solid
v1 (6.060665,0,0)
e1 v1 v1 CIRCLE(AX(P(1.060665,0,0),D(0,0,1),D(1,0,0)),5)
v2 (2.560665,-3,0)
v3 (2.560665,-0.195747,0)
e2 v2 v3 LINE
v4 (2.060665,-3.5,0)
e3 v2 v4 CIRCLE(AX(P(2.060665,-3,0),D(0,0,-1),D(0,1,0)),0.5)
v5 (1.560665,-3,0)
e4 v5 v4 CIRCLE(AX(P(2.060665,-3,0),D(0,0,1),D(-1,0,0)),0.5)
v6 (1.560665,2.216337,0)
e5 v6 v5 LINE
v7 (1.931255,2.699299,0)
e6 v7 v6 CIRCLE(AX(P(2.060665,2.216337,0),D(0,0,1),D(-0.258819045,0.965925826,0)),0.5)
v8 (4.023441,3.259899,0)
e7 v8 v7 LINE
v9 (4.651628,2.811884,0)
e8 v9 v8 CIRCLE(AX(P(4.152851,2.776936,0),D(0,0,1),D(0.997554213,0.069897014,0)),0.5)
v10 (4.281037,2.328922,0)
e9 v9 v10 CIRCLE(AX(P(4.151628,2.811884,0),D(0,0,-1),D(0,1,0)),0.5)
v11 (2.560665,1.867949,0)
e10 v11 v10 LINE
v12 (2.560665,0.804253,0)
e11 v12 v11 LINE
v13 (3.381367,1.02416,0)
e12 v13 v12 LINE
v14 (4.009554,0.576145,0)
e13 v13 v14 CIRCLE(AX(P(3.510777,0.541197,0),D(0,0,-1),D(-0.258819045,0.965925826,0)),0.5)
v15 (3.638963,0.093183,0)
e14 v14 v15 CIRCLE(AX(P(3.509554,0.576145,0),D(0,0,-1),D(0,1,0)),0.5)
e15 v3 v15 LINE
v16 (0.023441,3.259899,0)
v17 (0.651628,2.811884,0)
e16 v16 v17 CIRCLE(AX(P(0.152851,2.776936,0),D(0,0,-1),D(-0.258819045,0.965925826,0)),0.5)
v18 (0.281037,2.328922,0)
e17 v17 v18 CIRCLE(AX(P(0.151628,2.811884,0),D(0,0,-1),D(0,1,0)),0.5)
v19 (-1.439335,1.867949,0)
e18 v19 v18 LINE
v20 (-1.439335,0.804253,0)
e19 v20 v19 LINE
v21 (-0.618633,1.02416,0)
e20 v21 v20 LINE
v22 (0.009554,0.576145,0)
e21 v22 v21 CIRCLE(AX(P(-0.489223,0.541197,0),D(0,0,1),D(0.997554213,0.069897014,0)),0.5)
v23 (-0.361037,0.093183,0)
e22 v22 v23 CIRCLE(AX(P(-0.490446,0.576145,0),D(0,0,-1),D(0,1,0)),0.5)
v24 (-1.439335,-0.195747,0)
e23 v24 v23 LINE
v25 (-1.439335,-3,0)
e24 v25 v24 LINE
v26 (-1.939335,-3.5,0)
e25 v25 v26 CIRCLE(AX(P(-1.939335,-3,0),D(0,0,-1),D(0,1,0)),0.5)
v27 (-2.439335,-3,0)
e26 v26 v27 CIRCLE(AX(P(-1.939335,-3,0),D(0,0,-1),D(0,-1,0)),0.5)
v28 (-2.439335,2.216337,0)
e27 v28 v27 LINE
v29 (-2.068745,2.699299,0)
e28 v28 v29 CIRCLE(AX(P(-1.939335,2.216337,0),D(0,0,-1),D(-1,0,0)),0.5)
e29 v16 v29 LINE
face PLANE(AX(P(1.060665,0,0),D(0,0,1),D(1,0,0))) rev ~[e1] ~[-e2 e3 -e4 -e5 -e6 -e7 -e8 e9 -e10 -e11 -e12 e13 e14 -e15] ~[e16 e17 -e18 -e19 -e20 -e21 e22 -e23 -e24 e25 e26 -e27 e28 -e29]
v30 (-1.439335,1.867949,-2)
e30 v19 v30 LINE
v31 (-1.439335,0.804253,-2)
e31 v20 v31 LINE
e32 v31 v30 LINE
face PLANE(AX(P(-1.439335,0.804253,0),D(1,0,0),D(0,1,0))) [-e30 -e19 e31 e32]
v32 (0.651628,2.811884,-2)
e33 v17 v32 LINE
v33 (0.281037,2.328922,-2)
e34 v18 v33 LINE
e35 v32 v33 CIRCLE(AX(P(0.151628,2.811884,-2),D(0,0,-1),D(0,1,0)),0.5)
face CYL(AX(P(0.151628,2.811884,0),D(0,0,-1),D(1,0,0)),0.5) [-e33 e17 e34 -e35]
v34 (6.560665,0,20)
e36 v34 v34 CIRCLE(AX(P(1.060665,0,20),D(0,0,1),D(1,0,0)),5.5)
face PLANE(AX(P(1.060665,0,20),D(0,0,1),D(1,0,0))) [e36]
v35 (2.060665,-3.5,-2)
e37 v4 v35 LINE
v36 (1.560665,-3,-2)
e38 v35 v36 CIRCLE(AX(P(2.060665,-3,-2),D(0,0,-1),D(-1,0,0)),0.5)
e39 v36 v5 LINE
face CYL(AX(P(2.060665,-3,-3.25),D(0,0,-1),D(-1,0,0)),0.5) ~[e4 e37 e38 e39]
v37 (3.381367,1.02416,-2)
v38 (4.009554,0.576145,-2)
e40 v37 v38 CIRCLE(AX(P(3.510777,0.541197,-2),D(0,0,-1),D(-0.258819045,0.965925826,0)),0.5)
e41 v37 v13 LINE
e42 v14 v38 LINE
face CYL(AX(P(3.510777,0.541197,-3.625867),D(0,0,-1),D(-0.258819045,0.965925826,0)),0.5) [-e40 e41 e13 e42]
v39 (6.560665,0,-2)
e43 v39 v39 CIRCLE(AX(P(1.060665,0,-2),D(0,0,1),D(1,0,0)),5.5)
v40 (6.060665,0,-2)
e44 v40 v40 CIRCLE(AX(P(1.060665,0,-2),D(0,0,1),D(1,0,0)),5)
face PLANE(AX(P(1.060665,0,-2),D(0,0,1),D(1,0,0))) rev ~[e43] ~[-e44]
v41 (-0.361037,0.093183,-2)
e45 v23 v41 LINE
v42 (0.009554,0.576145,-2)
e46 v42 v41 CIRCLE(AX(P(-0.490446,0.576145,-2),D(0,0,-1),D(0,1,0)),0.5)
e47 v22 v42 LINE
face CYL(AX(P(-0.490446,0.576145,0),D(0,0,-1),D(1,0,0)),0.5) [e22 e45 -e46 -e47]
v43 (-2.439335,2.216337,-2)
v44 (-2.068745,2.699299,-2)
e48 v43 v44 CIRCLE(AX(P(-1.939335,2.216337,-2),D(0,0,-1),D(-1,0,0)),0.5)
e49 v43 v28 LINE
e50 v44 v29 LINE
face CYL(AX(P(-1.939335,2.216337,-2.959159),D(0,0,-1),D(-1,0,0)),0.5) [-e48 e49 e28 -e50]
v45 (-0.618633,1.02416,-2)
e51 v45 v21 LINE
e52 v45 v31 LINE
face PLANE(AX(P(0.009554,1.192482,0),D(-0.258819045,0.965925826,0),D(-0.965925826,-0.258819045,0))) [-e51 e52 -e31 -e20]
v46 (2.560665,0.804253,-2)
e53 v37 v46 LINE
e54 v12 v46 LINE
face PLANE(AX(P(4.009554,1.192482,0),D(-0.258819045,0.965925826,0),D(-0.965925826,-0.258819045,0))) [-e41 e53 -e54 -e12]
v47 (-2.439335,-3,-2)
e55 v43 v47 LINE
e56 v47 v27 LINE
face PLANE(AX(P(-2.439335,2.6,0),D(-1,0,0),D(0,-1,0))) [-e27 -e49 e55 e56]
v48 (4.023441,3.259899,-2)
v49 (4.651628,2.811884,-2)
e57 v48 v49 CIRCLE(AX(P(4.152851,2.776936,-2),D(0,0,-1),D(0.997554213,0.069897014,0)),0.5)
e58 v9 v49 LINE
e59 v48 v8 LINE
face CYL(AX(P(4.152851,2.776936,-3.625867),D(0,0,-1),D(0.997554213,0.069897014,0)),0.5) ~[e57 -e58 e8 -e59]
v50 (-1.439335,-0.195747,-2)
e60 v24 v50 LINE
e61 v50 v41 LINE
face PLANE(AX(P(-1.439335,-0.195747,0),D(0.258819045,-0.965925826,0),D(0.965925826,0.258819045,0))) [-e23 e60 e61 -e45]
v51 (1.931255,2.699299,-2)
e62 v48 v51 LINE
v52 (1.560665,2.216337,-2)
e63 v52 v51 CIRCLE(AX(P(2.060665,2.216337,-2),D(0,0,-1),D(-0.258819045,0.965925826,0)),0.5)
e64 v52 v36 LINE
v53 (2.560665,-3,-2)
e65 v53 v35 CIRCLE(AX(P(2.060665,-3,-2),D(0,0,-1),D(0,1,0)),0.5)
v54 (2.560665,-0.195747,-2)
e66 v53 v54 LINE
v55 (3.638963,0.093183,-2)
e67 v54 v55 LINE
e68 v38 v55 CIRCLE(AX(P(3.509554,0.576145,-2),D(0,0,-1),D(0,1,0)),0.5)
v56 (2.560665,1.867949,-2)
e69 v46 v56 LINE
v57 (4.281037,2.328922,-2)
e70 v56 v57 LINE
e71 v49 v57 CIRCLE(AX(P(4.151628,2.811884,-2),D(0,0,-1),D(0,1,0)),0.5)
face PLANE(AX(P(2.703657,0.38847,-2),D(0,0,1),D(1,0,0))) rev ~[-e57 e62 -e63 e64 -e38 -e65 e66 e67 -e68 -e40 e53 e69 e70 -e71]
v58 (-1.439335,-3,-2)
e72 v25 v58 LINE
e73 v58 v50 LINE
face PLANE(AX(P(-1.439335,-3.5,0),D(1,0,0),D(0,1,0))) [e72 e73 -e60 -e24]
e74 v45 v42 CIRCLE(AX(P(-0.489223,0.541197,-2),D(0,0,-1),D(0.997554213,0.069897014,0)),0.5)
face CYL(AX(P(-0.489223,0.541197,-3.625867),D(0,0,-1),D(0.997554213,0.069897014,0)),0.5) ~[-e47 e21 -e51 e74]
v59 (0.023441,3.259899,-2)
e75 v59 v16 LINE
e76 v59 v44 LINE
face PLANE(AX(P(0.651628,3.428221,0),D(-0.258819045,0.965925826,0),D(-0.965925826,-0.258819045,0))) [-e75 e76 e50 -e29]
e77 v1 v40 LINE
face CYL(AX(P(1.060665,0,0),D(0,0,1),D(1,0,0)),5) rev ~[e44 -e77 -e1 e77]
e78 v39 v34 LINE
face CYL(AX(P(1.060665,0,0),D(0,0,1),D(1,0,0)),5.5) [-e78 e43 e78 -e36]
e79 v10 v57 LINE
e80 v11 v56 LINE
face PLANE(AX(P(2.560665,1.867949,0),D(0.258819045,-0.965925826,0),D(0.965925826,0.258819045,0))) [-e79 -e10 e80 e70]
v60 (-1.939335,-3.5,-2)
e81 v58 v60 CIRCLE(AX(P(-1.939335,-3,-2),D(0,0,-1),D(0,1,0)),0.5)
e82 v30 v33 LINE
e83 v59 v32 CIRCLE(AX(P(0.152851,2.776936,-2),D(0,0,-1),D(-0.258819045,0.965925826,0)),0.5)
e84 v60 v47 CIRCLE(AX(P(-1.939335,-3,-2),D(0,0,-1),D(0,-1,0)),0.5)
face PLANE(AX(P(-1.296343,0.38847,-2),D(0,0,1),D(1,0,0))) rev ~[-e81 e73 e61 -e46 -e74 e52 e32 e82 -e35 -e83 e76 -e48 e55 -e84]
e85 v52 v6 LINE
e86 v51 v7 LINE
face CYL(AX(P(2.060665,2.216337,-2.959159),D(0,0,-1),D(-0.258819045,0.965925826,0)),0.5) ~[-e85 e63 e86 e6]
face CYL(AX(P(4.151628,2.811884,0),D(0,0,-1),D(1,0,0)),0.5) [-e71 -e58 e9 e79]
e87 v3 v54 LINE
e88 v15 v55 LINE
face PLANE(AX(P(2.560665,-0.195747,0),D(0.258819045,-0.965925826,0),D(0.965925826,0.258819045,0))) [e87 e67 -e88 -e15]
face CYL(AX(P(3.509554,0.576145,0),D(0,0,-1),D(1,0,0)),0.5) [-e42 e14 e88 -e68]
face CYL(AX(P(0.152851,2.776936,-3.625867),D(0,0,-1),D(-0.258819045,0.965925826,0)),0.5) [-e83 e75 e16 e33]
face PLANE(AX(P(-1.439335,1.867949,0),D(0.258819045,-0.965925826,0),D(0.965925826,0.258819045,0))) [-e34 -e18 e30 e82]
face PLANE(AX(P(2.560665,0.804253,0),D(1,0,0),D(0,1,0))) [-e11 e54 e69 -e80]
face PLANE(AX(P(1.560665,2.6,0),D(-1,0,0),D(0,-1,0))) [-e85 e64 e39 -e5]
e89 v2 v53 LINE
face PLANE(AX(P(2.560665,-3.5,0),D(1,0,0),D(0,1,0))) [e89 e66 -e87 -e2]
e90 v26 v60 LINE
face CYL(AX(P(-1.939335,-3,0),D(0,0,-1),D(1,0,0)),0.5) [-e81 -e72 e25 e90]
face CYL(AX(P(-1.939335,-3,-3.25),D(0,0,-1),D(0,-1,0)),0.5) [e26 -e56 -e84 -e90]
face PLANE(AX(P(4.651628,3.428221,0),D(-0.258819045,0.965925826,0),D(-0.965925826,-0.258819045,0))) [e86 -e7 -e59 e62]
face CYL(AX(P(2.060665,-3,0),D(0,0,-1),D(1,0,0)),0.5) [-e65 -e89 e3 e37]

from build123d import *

# Parameters (mm, degrees)
F0_R        = 5.5
F0_R_2      = 5
F1_DEPTH    = 20
F2_DEPTH    = 2
F3_R        = 0.5
F4_T1_DEPTH = 3.6258666345
F4_T3_DEPTH = 3.25
F4_T5_DEPTH = 2.959158735


# Not quite as in the source:
# - a fillet or chamfer that OpenCascade refuses, or shapes differently, is made with other operations: its cross-section is extruded or revolved along the edge and cut away or added
# - a feature names something its author has since deleted; it is built from what else it names


with BuildPart() as f1:
    # F0 (on Top) → F1 (new body)
    with BuildSketch(Plane.XY):
        with Locations((1.0606649963, 0)):
            Circle(F0_R)
        with Locations((1.0606649963, 0)):
            Circle(F0_R_2, mode=Mode.SUBTRACT)
        with Locations((1.0606649963, 0)):
            Circle(F0_R_2)
        Polygon((-1.4393350037, -3.5), (-2.4393350037, -3.5), (-2.4393350037, 2.6), (0.6516276405, 3.4282209443), (0.6516276405, 2.4282209443), (-1.4393350037, 1.8679491924), (-1.4393350037, 0.8042534147), (0.0095537358, 1.1924819824), (0.0095537358, 0.1924819824), (-1.4393350037, -0.1957465853), align=None, mode=Mode.SUBTRACT)
        Polygon((1.5606649963, -3.5), (1.5606649963, 2.6), (4.6516276405, 3.4282209443), (4.6516276405, 2.4282209443), (2.5606649963, 1.8679491924), (2.5606649963, 0.8042534147), (4.0095537358, 1.1924819824), (4.0095537358, 0.1924819824), (2.5606649963, -0.1957465853), (2.5606649963, -3.5), align=None, mode=Mode.SUBTRACT)
        Polygon((4.6516276405, 3.4282209443), (1.5606649963, 2.6), (1.5606649963, -3.5), (2.5606649963, -3.5), (2.5606649963, -0.1957465853), (4.0095537358, 0.1924819824), (4.0095537358, 1.1924819824), (2.5606649963, 0.8042534147), (2.5606649963, 1.8679491924), (4.6516276405, 2.4282209443), align=None)
        Polygon((-2.4393350037, 2.6), (-2.4393350037, -3.5), (-1.4393350037, -3.5), (-1.4393350037, -0.1957465853), (0.0095537358, 0.1924819824), (0.0095537358, 1.1924819824), (-1.4393350037, 0.8042534147), (-1.4393350037, 1.8679491924), (0.6516276405, 2.4282209443), (0.6516276405, 3.4282209443), align=None)
    extrude(amount=F1_DEPTH)

    # F0 (on Top) → F2 (join)
    with BuildSketch(Plane.XY):
        with Locations((1.0606649963, 0)):
            Circle(F0_R)
        with Locations((1.0606649963, 0)):
            Circle(F0_R_2, mode=Mode.SUBTRACT)
        Polygon((-2.4393350037, 2.6), (-2.4393350037, -3.5), (-1.4393350037, -3.5), (-1.4393350037, -0.1957465853), (0.0095537358, 0.1924819824), (0.0095537358, 1.1924819824), (-1.4393350037, 0.8042534147), (-1.4393350037, 1.8679491924), (0.6516276405, 2.4282209443), (0.6516276405, 3.4282209443), align=None)
        Polygon((4.6516276405, 3.4282209443), (1.5606649963, 2.6), (1.5606649963, -3.5), (2.5606649963, -3.5), (2.5606649963, -0.1957465853), (4.0095537358, 0.1924819824), (4.0095537358, 1.1924819824), (2.5606649963, 0.8042534147), (2.5606649963, 1.8679491924), (4.6516276405, 2.4282209443), align=None)
    extrude(amount=-F2_DEPTH)

    # F3
    f3_edges = [f1.edges().sort_by_distance(p)[0] for p in [
        (2.560665, -3.5, -1),
        (-1.439335, -3.5, -1),
        (4.009554, 0.192482, -1),
        (0.009554, 0.192482, -1),
        (4.651628, 2.428221, -1),
        (0.651628, 2.428221, -1),
    ]]
    fillet(f3_edges, radius=F3_R)

    # F4: fillet of radius 0.5 on 8 edges, made by hand

    # F4_s2 → F4_t1 (cut)
    with BuildSketch(Plane.XY.offset(-3.6258666345)):
        with BuildLine():
            ThreePointArc((4.6516276405, 2.8118844383), (4.4431733372, 3.1840141424), (4.0234410115, 3.2598988444))
            Line((4.0234410115, 3.2598988444), (4.6516276405, 3.4282209443))
            Line((4.6516276405, 3.4282209443), (4.6516276405, 2.8118844383))
        make_face()
        with BuildLine():
            ThreePointArc((0.0234410115, 3.2598988444), (0.4431733372, 3.1840141424), (0.6516276405, 2.8118844383))
            Line((0.6516276405, 2.8118844383), (0.6516276405, 3.4282209443))
            Line((0.6516276405, 3.4282209443), (0.0234410115, 3.2598988444))
        make_face()
        with BuildLine():
            ThreePointArc((0.0095537358, 0.5761454764), (-0.1989005675, 0.9482751804), (-0.6186328932, 1.0241598824))
            Line((-0.6186328932, 1.0241598824), (0.0095537358, 1.1924819824))
            Line((0.0095537358, 1.1924819824), (0.0095537358, 0.5761454764))
        make_face()
        with BuildLine():
            ThreePointArc((3.3813671068, 1.0241598824), (3.8010994325, 0.9482751804), (4.0095537358, 0.5761454764))
            Line((4.0095537358, 0.5761454764), (4.0095537358, 1.1924819824))
            Line((4.0095537358, 1.1924819824), (3.3813671068, 1.0241598824))
        make_face()
    extrude(amount=F4_T1_DEPTH, mode=Mode.SUBTRACT)

    # F4_s4 → F4_t3 (cut)
    with BuildSketch(Plane.XY.offset(-3.25)):
        with BuildLine():
            ThreePointArc((1.5606649963, -3), (1.7071116058, -3.3535533906), (2.0606649963, -3.5))
            Line((2.0606649963, -3.5), (1.5606649963, -3.5))
            Line((1.5606649963, -3.5), (1.5606649963, -3))
        make_face()
        with BuildLine():
            ThreePointArc((-1.9393350037, -3.5), (-2.2928883942, -3.3535533906), (-2.4393350037, -3))
            Line((-2.4393350037, -3), (-2.4393350037, -3.5))
            Line((-2.4393350037, -3.5), (-1.9393350037, -3.5))
        make_face()
    extrude(amount=F4_T3_DEPTH, mode=Mode.SUBTRACT)

    # F4_s6 → F4_t5 (cut)
    with BuildSketch(Plane.XY.offset(-2.959158735)):
        with BuildLine():
            ThreePointArc((1.9312554738, 2.6992994192), (1.6639883262, 2.5207172205), (1.5606649963, 2.216336506))
            Line((1.5606649963, 2.216336506), (1.5606649963, 2.6))
            Line((1.5606649963, 2.6), (1.9312554738, 2.6992994192))
        make_face()
        with BuildLine():
            ThreePointArc((-2.4393350037, 2.216336506), (-2.3360116738, 2.5207172205), (-2.0687445262, 2.6992994192))
            Line((-2.0687445262, 2.6992994192), (-2.4393350037, 2.6))
            Line((-2.4393350037, 2.6), (-2.4393350037, 2.216336506))
        make_face()
    extrude(amount=F4_T5_DEPTH, mode=Mode.SUBTRACT)


solid = f1.part
